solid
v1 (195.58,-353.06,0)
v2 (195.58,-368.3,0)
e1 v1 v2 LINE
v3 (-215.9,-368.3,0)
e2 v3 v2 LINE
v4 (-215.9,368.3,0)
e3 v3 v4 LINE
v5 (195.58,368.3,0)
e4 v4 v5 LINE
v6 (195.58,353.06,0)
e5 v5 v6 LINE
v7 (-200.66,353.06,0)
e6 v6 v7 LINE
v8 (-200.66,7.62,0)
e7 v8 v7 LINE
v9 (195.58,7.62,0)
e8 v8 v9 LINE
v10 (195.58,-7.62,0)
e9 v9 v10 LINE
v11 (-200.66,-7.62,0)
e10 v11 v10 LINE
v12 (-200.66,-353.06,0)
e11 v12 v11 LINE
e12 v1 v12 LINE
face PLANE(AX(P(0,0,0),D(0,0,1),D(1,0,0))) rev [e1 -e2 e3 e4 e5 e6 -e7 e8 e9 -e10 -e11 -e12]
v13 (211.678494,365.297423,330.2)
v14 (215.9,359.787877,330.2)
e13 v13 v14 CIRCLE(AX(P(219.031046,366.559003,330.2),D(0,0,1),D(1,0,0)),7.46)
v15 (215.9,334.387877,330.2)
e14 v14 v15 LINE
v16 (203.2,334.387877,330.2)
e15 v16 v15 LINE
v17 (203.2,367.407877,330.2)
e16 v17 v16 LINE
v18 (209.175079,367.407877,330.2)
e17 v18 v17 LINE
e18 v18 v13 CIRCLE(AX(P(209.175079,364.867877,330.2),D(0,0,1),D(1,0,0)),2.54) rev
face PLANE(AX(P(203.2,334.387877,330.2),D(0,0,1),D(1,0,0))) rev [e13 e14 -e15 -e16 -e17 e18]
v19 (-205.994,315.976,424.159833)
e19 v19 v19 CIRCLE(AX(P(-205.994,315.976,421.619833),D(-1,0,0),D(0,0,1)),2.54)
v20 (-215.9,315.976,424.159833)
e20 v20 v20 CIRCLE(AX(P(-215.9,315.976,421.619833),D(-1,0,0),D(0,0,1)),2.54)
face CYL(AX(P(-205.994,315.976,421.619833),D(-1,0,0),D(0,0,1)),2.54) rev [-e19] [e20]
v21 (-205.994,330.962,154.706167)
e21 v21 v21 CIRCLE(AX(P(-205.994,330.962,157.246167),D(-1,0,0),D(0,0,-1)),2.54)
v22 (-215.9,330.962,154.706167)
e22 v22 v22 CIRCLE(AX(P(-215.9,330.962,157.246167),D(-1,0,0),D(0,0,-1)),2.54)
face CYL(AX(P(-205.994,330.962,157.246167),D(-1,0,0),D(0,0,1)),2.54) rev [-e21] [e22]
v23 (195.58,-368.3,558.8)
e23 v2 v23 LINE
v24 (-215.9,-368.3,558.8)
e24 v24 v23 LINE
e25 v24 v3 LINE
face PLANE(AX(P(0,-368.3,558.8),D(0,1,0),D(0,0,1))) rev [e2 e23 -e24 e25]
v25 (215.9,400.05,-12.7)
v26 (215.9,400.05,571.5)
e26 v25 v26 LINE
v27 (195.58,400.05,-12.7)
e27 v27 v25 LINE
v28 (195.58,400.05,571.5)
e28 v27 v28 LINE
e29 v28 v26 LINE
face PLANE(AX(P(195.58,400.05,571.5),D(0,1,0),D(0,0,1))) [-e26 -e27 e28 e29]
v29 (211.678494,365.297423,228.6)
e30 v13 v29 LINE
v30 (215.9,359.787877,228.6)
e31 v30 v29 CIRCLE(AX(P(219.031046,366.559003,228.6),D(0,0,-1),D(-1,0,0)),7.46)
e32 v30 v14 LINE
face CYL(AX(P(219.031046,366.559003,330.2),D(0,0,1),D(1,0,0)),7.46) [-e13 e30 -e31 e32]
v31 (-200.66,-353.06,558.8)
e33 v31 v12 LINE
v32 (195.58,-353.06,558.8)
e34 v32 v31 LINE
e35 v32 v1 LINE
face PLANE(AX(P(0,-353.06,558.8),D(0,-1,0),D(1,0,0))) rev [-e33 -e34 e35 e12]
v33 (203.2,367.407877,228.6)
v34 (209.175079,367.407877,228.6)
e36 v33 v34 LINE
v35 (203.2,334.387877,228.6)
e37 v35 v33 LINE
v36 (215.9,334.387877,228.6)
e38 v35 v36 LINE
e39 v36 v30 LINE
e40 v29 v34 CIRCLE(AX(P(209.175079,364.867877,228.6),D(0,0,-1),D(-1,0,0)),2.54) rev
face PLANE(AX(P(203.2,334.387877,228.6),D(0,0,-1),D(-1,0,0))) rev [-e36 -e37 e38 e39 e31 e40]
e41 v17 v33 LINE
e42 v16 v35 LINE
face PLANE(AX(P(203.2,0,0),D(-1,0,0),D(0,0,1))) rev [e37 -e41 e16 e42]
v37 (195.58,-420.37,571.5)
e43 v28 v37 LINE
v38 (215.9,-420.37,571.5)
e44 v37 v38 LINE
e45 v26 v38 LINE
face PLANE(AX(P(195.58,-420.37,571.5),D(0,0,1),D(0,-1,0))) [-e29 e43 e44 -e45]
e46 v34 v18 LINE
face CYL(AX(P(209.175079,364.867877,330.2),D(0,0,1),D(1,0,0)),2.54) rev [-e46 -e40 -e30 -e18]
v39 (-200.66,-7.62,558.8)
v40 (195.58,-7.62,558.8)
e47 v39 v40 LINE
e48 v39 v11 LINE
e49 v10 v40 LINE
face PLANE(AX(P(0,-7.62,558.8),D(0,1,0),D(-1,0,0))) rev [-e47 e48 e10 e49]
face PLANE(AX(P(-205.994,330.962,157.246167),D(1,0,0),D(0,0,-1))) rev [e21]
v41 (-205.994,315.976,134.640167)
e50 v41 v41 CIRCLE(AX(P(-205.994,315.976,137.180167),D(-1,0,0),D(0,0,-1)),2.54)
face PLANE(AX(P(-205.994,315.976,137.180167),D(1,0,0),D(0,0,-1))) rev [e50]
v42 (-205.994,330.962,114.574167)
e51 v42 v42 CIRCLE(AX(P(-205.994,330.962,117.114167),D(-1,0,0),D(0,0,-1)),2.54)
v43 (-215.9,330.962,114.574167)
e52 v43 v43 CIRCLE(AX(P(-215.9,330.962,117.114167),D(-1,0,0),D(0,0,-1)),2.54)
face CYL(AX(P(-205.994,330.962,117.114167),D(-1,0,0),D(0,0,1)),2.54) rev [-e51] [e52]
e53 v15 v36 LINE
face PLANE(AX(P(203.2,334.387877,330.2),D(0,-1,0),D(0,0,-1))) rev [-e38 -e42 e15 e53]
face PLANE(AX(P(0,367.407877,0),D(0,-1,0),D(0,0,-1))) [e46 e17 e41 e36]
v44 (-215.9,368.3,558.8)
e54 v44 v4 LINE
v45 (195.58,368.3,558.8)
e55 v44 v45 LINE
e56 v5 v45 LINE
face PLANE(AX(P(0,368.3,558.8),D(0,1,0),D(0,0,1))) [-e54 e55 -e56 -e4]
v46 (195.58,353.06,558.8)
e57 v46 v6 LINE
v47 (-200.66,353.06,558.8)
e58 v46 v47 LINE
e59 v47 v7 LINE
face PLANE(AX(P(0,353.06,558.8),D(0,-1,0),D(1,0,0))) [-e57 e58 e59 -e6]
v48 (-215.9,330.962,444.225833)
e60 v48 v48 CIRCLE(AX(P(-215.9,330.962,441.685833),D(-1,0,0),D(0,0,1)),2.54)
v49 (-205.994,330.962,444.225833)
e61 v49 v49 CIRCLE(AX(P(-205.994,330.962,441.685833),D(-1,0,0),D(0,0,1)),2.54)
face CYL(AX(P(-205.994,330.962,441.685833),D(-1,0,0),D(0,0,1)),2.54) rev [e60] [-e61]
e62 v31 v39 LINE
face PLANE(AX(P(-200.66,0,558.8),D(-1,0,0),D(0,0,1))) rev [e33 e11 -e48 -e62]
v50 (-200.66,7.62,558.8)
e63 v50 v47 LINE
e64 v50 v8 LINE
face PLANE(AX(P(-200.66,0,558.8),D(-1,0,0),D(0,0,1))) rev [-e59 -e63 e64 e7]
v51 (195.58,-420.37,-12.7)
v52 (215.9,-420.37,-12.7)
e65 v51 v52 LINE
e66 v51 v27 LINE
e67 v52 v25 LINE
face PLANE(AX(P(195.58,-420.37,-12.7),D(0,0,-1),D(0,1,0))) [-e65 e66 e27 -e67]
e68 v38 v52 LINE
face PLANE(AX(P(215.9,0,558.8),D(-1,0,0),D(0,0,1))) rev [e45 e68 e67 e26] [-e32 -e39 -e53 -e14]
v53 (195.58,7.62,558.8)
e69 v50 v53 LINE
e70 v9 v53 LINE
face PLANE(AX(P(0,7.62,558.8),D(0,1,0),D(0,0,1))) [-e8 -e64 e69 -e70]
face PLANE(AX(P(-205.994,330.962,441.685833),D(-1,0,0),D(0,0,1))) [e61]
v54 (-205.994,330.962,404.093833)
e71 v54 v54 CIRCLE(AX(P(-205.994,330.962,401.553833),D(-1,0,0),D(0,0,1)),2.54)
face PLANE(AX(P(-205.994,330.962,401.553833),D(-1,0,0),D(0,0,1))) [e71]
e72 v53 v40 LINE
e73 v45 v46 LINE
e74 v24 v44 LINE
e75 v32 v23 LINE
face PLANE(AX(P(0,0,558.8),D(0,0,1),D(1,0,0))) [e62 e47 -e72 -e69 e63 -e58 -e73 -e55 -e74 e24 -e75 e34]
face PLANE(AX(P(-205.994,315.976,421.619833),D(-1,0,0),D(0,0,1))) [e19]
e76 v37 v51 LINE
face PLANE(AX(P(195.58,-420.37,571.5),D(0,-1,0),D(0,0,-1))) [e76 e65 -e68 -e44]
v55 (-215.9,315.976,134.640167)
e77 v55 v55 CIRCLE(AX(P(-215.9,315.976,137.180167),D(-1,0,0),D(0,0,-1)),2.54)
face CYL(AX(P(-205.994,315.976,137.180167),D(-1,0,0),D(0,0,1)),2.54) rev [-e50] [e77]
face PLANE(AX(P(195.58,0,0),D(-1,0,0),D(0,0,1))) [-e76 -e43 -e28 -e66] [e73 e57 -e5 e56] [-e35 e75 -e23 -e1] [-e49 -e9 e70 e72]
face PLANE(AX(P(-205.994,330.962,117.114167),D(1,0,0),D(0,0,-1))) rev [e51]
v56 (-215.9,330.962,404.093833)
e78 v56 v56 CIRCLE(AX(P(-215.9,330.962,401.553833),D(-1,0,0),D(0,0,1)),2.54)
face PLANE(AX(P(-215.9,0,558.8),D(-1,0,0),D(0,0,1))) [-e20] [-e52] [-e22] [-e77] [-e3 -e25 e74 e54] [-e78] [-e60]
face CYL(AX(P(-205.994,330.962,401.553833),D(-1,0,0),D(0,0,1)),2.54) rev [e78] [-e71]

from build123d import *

# Parameters (mm, degrees)
SKETCH1_W           = 431.8
SKETCH1_H           = 736.6
SKETCH1_W_2         = 401.32
SKETCH1_H_2         = 706.12
SKETCH1_H_3         = 15.24
BOSS_EXTRUDE1_DEPTH = 558.8
SKETCH3_W           = 584.2
SKETCH3_H           = 820.42
BOSS_EXTRUDE2_DEPTH = 20.32
SKETCH4_W           = 101.6
SKETCH4_H           = 25.4
CUT_EXTRUDE1_DEPTH  = 12.7
CUT_EXTRUDE2_DEPTH  = 7.62
FILLET1_R           = 7.46
FILLET2_R           = 2.54
SKETCH6_R           = 2.54
CUT_EXTRUDE3_DEPTH  = 9.906


with BuildPart() as part:
    # Sketch1 → Boss-Extrude1 (new body)
    # profile 1 of 2: a face of its own
    with BuildSketch(Plane.XY):
        Rectangle(SKETCH1_W, SKETCH1_H)
        Rectangle(SKETCH1_W_2, SKETCH1_H_2, mode=Mode.SUBTRACT)
    # profile 2 of 2: a face of its own
    with BuildSketch(Plane.XY):
        Rectangle(SKETCH1_W_2, SKETCH1_H_3)
    extrude(amount=BOSS_EXTRUDE1_DEPTH)

    # Sketch3 → Boss-Extrude2 (add)
    with BuildSketch(Plane(origin=(215.9, 0, 0), x_dir=(0, 0, -1), z_dir=(1, 0, 0))):
        with Locations((-279.4, -10.16)):
            Rectangle(SKETCH3_W, SKETCH3_H)
    extrude(amount=-BOSS_EXTRUDE2_DEPTH)

    # Sketch4 → Cut-Extrude1 (cut)
    with BuildSketch(Plane(origin=(215.9, 0, 0), x_dir=(0, 0, -1), z_dir=(1, 0, 0))):
        with Locations((-279.4, 347.087877014)):
            Rectangle(SKETCH4_W, SKETCH4_H)
    extrude(amount=-CUT_EXTRUDE1_DEPTH, mode=Mode.SUBTRACT)

    # Sketch5 → Cut-Extrude2 (cut)
    with BuildSketch(Plane.XZ.offset(-359.787877014)):
        Polygon((211.571045912, 228.6), (211.571045912, 330.2), (207.242091825, 330.2), (203.2, 330.2), (203.2, 228.6), (207.242091825, 228.6), align=None)
    extrude(amount=-CUT_EXTRUDE2_DEPTH, mode=Mode.SUBTRACT)

    # Fillet1
    # the kernel refuses this fillet: 7.46 mm, written as the material it takes off along each edge
    with BuildSketch(Plane(origin=(211.571045912, 359.787877014, 228.6), x_dir=(0, 1, 0), z_dir=(0, 0, 1))) as fillet1_piece_1:
        with BuildLine():
            CenterArc((6.771126309, -7.46), FILLET1_R, 90, 65.183641266)
            Line((0, -4.328954088), (-0.135422526, -4.266333169))
            ThreePointArc((-0.135422526, -4.266333169), (-0.1492, -2.164477044), (-0.1492, 0))
            Line((-0.1492, 0), (0, 0.1492))
            Line((0, 0.1492), (6.771126309, 0.1492))
            Line((6.771126309, 0.1492), (6.771126309, 0))
        make_face()
    extrude(amount=101.6, mode=Mode.SUBTRACT)

    # Fillet2
    fillet2_edges = [part.edges().sort_by_distance(p)[0] for p in [
        (211.571045912, 367.407877014, 279.4),
    ]]
    fillet(fillet2_edges, radius=FILLET2_R)

    # Sketch6 → Cut-Extrude3 (cut)
    with BuildSketch(Plane.ZY.offset(215.9)):
        with Locations((441.685832518, 330.962)):
            Circle(SKETCH6_R)
        with Locations((401.553832518, 330.962)):
            Circle(SKETCH6_R)
        with Locations((421.619832518, 315.976)):
            Circle(SKETCH6_R)
        with Locations(Location((137.180167482, 315.976, 0), (0, 0, 180))):
            Circle(SKETCH6_R)
        with Locations(Location((157.246167482, 330.962, 0), (0, 0, 180))):
            Circle(SKETCH6_R)
        with Locations(Location((117.114167482, 330.962, 0), (0, 0, 180))):
            Circle(SKETCH6_R)
    extrude(amount=-CUT_EXTRUDE3_DEPTH, mode=Mode.SUBTRACT)


solid = part.part
